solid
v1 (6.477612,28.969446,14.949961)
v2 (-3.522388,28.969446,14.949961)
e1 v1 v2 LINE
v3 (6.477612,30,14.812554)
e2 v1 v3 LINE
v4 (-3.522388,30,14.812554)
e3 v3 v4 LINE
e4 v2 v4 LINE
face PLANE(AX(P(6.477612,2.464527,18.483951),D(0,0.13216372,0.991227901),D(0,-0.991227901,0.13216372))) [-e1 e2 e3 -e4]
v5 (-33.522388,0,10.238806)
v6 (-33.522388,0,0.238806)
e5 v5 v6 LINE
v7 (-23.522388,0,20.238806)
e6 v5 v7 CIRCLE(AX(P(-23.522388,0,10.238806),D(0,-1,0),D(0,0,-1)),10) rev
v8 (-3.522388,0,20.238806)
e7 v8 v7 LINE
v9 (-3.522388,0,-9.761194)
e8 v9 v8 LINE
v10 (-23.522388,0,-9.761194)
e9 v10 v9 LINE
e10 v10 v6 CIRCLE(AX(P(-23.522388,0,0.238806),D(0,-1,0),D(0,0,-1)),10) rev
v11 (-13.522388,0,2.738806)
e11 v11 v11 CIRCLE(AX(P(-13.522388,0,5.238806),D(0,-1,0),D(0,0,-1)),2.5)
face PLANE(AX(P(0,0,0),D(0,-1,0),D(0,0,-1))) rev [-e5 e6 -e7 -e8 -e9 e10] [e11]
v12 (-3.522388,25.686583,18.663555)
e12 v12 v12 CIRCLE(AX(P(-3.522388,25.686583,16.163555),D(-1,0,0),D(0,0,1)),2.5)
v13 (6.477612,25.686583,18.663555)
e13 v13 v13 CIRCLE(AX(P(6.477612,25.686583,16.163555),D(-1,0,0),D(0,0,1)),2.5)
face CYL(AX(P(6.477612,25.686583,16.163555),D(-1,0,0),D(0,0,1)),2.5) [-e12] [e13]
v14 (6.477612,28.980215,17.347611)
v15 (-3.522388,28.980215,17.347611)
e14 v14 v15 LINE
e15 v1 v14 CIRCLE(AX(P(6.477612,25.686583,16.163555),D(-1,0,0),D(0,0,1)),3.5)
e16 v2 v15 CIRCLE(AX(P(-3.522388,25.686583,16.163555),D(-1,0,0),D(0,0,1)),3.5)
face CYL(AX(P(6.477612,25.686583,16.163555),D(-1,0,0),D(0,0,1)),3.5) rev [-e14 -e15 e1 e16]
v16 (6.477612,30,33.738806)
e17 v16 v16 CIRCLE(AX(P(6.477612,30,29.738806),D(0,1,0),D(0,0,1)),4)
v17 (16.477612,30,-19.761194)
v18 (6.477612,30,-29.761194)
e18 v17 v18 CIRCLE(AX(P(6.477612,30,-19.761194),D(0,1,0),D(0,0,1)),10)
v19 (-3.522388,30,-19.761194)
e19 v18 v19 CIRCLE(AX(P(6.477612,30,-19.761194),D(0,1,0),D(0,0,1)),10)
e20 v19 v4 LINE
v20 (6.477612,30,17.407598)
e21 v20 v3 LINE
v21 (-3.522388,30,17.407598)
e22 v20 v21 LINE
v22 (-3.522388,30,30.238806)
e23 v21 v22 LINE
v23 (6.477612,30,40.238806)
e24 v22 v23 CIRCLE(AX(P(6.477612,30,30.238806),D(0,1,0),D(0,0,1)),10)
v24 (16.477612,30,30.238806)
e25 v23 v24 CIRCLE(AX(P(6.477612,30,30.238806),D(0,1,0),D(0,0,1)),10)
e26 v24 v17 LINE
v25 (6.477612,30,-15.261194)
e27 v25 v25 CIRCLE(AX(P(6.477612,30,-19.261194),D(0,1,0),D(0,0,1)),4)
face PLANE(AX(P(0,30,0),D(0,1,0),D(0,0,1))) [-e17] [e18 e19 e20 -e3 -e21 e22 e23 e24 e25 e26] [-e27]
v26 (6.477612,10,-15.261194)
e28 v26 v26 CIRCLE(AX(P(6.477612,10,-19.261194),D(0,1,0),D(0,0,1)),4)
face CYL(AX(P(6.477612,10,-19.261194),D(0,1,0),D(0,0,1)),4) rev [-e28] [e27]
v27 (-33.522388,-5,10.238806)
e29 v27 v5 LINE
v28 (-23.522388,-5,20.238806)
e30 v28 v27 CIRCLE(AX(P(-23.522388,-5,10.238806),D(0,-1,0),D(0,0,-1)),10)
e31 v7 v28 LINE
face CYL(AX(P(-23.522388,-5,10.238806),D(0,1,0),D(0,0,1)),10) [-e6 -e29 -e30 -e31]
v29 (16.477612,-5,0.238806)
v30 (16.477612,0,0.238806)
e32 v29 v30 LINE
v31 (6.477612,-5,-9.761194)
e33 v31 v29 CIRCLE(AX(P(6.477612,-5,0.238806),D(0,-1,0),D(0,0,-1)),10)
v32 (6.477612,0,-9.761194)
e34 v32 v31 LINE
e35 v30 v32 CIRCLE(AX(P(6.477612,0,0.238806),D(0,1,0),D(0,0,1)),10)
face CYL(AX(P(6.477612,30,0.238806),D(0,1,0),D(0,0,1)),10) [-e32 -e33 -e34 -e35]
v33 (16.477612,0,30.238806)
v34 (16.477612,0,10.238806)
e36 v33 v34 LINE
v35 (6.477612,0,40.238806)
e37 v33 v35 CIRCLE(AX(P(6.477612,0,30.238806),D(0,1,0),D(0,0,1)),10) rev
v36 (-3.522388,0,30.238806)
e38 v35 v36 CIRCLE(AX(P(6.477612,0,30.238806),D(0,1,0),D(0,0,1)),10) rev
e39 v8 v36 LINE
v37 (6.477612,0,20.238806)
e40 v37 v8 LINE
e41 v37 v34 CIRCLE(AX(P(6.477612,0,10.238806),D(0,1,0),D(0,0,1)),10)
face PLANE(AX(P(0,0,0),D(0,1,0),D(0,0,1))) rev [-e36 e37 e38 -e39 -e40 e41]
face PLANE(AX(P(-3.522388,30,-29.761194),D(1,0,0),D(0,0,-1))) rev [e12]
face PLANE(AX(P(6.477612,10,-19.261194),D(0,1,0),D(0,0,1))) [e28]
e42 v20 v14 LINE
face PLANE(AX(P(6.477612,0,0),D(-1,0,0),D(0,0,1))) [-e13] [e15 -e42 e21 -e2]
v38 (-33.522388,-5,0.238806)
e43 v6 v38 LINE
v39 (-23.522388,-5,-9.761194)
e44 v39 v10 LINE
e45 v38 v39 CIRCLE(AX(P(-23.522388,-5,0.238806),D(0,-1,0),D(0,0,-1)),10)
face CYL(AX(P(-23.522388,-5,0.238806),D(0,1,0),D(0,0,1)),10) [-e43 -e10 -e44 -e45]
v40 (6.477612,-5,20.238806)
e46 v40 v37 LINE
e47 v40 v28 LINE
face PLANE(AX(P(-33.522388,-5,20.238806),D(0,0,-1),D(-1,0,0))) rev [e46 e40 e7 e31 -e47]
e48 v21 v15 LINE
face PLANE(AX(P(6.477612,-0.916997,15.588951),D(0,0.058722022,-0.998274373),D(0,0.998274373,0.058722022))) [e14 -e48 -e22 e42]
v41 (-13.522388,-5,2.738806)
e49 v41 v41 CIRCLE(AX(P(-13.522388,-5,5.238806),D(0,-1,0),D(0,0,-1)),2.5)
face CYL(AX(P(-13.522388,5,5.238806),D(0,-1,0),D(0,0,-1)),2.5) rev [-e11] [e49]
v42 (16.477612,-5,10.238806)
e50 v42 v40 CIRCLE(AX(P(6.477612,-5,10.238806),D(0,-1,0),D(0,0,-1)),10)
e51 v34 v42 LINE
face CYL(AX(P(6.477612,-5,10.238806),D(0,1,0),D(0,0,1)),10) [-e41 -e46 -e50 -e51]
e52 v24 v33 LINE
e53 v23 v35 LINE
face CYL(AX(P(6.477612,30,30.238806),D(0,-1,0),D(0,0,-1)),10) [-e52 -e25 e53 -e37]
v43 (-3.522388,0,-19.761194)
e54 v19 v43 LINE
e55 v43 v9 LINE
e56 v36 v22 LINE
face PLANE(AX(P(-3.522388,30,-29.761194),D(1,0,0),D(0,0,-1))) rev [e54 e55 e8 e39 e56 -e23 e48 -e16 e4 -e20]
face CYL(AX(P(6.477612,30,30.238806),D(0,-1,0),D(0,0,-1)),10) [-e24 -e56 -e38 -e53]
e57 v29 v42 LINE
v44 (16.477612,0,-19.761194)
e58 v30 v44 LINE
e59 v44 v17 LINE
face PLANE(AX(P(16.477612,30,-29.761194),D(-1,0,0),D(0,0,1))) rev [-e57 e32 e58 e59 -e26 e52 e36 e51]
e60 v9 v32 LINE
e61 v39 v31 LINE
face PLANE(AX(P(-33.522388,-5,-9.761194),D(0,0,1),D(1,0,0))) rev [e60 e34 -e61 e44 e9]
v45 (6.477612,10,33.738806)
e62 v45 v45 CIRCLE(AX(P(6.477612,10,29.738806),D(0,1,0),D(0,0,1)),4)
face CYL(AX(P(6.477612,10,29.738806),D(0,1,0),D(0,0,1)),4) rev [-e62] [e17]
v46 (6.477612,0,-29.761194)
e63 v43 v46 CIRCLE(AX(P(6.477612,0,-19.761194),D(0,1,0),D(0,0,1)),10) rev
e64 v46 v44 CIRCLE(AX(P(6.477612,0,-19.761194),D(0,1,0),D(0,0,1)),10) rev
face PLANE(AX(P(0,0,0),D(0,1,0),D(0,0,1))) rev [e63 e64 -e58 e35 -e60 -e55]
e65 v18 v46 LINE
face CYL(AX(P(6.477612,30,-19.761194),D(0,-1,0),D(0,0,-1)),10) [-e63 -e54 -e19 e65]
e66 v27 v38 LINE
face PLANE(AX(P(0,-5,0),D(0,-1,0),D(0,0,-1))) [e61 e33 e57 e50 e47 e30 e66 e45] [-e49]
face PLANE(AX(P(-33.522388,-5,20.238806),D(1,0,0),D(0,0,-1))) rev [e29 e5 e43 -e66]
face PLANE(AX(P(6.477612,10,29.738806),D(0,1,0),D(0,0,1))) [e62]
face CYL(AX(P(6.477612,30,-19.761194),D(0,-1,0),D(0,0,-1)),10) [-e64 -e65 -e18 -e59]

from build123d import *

# Parameters (mm, degrees)
SKETCH2_W           = 20
SKETCH2_H           = 70
BOSS_EXTRUDE1_DEPTH = 30
SKETCH3_R           = 4
CUT_EXTRUDE1_DEPTH  = 20
SKETCH4_R           = 2.5
CUT_EXTRUDE2_DEPTH  = 10
FILLET1_R           = 10
SKETCH6_W           = 50
SKETCH6_H           = 30
BOSS_EXTRUDE3_DEPTH = 5
SKETCH7_R           = 2.5
CUT_EXTRUDE3_DEPTH  = 10
FILLET3_R           = 10


with BuildPart() as part:
    # Sketch2 → Boss-Extrude1 (new body)
    with BuildSketch(Plane(origin=(0, 0, 0), x_dir=(1, 0, 0), z_dir=(0, 1, 0))):
        with Locations((6.47761194, -5.23880597)):
            Rectangle(SKETCH2_W, SKETCH2_H)
    extrude(amount=BOSS_EXTRUDE1_DEPTH)

    # Sketch3 → Cut-Extrude1 (cut)
    with BuildSketch(Plane(origin=(0, 30, 0), x_dir=(1, 0, 0), z_dir=(0, 1, 0))):
        with Locations(Location((6.47761194, 19.26119403, 0), (0, 0, 270))):
            Circle(SKETCH3_R)
        with Locations(Location((6.47761194, -29.73880597, 0), (0, 0, 270))):
            Circle(SKETCH3_R)
    extrude(amount=-CUT_EXTRUDE1_DEPTH, mode=Mode.SUBTRACT)

    # Sketch4 → Cut-Extrude2 (cut)
    with BuildSketch(Plane.ZY.offset(3.52238806)):
        with BuildLine():
            Line((17.415034126, 30.126407987), (14.795699792, 30.126407987))
            Line((14.795699792, 30.126407987), (14.949961333, 28.969446425))
            ThreePointArc((14.949961333, 28.969446425), (16.17927412, 22.186618473), (17.347611009, 28.980215007))
            Line((17.347611009, 28.980215007), (17.415034126, 30.126407987))
        make_face()
        with Locations((16.163554702, 25.686583173)):
            Circle(SKETCH4_R, mode=Mode.SUBTRACT)
    extrude(amount=-CUT_EXTRUDE2_DEPTH, mode=Mode.SUBTRACT)

    # Fillet1
    fillet1_edges = [part.edges().sort_by_distance(p)[0] for p in [
        (-3.52238806, 15, -29.76119403),
        (16.47761194, 15, -29.76119403),
        (16.47761194, 15, 40.23880597),
        (-3.52238806, 15, 40.23880597),
    ]]
    fillet(fillet1_edges, radius=FILLET1_R - 0.0001)  # a hair under: the kernel refuses the full size

    # Sketch6 → Boss-Extrude3 (add)
    with BuildSketch(Plane.XZ):
        with Locations((-8.52238806, 5.23880597)):
            Rectangle(SKETCH6_W, SKETCH6_H)
    extrude(amount=BOSS_EXTRUDE3_DEPTH)

    # Sketch7 → Cut-Extrude3 (cut)
    with BuildSketch(Plane.XZ.offset(5)):
        with Locations(Location((-13.52238806, 5.23880597, 0), (0, 0, 270))):
            Circle(SKETCH7_R)
    extrude(amount=-CUT_EXTRUDE3_DEPTH, mode=Mode.SUBTRACT)

    # Fillet3
    fillet3_edges = [part.edges().sort_by_distance(p)[0] for p in [
        (-33.52238806, -2.5, 20.23880597),
        (-33.52238806, -2.5, -9.76119403),
        (16.47761194, -2.5, -9.76119403),
        (16.47761194, -2.5, 20.23880597),
    ]]
    fillet(fillet3_edges, radius=FILLET3_R)


solid = part.part
